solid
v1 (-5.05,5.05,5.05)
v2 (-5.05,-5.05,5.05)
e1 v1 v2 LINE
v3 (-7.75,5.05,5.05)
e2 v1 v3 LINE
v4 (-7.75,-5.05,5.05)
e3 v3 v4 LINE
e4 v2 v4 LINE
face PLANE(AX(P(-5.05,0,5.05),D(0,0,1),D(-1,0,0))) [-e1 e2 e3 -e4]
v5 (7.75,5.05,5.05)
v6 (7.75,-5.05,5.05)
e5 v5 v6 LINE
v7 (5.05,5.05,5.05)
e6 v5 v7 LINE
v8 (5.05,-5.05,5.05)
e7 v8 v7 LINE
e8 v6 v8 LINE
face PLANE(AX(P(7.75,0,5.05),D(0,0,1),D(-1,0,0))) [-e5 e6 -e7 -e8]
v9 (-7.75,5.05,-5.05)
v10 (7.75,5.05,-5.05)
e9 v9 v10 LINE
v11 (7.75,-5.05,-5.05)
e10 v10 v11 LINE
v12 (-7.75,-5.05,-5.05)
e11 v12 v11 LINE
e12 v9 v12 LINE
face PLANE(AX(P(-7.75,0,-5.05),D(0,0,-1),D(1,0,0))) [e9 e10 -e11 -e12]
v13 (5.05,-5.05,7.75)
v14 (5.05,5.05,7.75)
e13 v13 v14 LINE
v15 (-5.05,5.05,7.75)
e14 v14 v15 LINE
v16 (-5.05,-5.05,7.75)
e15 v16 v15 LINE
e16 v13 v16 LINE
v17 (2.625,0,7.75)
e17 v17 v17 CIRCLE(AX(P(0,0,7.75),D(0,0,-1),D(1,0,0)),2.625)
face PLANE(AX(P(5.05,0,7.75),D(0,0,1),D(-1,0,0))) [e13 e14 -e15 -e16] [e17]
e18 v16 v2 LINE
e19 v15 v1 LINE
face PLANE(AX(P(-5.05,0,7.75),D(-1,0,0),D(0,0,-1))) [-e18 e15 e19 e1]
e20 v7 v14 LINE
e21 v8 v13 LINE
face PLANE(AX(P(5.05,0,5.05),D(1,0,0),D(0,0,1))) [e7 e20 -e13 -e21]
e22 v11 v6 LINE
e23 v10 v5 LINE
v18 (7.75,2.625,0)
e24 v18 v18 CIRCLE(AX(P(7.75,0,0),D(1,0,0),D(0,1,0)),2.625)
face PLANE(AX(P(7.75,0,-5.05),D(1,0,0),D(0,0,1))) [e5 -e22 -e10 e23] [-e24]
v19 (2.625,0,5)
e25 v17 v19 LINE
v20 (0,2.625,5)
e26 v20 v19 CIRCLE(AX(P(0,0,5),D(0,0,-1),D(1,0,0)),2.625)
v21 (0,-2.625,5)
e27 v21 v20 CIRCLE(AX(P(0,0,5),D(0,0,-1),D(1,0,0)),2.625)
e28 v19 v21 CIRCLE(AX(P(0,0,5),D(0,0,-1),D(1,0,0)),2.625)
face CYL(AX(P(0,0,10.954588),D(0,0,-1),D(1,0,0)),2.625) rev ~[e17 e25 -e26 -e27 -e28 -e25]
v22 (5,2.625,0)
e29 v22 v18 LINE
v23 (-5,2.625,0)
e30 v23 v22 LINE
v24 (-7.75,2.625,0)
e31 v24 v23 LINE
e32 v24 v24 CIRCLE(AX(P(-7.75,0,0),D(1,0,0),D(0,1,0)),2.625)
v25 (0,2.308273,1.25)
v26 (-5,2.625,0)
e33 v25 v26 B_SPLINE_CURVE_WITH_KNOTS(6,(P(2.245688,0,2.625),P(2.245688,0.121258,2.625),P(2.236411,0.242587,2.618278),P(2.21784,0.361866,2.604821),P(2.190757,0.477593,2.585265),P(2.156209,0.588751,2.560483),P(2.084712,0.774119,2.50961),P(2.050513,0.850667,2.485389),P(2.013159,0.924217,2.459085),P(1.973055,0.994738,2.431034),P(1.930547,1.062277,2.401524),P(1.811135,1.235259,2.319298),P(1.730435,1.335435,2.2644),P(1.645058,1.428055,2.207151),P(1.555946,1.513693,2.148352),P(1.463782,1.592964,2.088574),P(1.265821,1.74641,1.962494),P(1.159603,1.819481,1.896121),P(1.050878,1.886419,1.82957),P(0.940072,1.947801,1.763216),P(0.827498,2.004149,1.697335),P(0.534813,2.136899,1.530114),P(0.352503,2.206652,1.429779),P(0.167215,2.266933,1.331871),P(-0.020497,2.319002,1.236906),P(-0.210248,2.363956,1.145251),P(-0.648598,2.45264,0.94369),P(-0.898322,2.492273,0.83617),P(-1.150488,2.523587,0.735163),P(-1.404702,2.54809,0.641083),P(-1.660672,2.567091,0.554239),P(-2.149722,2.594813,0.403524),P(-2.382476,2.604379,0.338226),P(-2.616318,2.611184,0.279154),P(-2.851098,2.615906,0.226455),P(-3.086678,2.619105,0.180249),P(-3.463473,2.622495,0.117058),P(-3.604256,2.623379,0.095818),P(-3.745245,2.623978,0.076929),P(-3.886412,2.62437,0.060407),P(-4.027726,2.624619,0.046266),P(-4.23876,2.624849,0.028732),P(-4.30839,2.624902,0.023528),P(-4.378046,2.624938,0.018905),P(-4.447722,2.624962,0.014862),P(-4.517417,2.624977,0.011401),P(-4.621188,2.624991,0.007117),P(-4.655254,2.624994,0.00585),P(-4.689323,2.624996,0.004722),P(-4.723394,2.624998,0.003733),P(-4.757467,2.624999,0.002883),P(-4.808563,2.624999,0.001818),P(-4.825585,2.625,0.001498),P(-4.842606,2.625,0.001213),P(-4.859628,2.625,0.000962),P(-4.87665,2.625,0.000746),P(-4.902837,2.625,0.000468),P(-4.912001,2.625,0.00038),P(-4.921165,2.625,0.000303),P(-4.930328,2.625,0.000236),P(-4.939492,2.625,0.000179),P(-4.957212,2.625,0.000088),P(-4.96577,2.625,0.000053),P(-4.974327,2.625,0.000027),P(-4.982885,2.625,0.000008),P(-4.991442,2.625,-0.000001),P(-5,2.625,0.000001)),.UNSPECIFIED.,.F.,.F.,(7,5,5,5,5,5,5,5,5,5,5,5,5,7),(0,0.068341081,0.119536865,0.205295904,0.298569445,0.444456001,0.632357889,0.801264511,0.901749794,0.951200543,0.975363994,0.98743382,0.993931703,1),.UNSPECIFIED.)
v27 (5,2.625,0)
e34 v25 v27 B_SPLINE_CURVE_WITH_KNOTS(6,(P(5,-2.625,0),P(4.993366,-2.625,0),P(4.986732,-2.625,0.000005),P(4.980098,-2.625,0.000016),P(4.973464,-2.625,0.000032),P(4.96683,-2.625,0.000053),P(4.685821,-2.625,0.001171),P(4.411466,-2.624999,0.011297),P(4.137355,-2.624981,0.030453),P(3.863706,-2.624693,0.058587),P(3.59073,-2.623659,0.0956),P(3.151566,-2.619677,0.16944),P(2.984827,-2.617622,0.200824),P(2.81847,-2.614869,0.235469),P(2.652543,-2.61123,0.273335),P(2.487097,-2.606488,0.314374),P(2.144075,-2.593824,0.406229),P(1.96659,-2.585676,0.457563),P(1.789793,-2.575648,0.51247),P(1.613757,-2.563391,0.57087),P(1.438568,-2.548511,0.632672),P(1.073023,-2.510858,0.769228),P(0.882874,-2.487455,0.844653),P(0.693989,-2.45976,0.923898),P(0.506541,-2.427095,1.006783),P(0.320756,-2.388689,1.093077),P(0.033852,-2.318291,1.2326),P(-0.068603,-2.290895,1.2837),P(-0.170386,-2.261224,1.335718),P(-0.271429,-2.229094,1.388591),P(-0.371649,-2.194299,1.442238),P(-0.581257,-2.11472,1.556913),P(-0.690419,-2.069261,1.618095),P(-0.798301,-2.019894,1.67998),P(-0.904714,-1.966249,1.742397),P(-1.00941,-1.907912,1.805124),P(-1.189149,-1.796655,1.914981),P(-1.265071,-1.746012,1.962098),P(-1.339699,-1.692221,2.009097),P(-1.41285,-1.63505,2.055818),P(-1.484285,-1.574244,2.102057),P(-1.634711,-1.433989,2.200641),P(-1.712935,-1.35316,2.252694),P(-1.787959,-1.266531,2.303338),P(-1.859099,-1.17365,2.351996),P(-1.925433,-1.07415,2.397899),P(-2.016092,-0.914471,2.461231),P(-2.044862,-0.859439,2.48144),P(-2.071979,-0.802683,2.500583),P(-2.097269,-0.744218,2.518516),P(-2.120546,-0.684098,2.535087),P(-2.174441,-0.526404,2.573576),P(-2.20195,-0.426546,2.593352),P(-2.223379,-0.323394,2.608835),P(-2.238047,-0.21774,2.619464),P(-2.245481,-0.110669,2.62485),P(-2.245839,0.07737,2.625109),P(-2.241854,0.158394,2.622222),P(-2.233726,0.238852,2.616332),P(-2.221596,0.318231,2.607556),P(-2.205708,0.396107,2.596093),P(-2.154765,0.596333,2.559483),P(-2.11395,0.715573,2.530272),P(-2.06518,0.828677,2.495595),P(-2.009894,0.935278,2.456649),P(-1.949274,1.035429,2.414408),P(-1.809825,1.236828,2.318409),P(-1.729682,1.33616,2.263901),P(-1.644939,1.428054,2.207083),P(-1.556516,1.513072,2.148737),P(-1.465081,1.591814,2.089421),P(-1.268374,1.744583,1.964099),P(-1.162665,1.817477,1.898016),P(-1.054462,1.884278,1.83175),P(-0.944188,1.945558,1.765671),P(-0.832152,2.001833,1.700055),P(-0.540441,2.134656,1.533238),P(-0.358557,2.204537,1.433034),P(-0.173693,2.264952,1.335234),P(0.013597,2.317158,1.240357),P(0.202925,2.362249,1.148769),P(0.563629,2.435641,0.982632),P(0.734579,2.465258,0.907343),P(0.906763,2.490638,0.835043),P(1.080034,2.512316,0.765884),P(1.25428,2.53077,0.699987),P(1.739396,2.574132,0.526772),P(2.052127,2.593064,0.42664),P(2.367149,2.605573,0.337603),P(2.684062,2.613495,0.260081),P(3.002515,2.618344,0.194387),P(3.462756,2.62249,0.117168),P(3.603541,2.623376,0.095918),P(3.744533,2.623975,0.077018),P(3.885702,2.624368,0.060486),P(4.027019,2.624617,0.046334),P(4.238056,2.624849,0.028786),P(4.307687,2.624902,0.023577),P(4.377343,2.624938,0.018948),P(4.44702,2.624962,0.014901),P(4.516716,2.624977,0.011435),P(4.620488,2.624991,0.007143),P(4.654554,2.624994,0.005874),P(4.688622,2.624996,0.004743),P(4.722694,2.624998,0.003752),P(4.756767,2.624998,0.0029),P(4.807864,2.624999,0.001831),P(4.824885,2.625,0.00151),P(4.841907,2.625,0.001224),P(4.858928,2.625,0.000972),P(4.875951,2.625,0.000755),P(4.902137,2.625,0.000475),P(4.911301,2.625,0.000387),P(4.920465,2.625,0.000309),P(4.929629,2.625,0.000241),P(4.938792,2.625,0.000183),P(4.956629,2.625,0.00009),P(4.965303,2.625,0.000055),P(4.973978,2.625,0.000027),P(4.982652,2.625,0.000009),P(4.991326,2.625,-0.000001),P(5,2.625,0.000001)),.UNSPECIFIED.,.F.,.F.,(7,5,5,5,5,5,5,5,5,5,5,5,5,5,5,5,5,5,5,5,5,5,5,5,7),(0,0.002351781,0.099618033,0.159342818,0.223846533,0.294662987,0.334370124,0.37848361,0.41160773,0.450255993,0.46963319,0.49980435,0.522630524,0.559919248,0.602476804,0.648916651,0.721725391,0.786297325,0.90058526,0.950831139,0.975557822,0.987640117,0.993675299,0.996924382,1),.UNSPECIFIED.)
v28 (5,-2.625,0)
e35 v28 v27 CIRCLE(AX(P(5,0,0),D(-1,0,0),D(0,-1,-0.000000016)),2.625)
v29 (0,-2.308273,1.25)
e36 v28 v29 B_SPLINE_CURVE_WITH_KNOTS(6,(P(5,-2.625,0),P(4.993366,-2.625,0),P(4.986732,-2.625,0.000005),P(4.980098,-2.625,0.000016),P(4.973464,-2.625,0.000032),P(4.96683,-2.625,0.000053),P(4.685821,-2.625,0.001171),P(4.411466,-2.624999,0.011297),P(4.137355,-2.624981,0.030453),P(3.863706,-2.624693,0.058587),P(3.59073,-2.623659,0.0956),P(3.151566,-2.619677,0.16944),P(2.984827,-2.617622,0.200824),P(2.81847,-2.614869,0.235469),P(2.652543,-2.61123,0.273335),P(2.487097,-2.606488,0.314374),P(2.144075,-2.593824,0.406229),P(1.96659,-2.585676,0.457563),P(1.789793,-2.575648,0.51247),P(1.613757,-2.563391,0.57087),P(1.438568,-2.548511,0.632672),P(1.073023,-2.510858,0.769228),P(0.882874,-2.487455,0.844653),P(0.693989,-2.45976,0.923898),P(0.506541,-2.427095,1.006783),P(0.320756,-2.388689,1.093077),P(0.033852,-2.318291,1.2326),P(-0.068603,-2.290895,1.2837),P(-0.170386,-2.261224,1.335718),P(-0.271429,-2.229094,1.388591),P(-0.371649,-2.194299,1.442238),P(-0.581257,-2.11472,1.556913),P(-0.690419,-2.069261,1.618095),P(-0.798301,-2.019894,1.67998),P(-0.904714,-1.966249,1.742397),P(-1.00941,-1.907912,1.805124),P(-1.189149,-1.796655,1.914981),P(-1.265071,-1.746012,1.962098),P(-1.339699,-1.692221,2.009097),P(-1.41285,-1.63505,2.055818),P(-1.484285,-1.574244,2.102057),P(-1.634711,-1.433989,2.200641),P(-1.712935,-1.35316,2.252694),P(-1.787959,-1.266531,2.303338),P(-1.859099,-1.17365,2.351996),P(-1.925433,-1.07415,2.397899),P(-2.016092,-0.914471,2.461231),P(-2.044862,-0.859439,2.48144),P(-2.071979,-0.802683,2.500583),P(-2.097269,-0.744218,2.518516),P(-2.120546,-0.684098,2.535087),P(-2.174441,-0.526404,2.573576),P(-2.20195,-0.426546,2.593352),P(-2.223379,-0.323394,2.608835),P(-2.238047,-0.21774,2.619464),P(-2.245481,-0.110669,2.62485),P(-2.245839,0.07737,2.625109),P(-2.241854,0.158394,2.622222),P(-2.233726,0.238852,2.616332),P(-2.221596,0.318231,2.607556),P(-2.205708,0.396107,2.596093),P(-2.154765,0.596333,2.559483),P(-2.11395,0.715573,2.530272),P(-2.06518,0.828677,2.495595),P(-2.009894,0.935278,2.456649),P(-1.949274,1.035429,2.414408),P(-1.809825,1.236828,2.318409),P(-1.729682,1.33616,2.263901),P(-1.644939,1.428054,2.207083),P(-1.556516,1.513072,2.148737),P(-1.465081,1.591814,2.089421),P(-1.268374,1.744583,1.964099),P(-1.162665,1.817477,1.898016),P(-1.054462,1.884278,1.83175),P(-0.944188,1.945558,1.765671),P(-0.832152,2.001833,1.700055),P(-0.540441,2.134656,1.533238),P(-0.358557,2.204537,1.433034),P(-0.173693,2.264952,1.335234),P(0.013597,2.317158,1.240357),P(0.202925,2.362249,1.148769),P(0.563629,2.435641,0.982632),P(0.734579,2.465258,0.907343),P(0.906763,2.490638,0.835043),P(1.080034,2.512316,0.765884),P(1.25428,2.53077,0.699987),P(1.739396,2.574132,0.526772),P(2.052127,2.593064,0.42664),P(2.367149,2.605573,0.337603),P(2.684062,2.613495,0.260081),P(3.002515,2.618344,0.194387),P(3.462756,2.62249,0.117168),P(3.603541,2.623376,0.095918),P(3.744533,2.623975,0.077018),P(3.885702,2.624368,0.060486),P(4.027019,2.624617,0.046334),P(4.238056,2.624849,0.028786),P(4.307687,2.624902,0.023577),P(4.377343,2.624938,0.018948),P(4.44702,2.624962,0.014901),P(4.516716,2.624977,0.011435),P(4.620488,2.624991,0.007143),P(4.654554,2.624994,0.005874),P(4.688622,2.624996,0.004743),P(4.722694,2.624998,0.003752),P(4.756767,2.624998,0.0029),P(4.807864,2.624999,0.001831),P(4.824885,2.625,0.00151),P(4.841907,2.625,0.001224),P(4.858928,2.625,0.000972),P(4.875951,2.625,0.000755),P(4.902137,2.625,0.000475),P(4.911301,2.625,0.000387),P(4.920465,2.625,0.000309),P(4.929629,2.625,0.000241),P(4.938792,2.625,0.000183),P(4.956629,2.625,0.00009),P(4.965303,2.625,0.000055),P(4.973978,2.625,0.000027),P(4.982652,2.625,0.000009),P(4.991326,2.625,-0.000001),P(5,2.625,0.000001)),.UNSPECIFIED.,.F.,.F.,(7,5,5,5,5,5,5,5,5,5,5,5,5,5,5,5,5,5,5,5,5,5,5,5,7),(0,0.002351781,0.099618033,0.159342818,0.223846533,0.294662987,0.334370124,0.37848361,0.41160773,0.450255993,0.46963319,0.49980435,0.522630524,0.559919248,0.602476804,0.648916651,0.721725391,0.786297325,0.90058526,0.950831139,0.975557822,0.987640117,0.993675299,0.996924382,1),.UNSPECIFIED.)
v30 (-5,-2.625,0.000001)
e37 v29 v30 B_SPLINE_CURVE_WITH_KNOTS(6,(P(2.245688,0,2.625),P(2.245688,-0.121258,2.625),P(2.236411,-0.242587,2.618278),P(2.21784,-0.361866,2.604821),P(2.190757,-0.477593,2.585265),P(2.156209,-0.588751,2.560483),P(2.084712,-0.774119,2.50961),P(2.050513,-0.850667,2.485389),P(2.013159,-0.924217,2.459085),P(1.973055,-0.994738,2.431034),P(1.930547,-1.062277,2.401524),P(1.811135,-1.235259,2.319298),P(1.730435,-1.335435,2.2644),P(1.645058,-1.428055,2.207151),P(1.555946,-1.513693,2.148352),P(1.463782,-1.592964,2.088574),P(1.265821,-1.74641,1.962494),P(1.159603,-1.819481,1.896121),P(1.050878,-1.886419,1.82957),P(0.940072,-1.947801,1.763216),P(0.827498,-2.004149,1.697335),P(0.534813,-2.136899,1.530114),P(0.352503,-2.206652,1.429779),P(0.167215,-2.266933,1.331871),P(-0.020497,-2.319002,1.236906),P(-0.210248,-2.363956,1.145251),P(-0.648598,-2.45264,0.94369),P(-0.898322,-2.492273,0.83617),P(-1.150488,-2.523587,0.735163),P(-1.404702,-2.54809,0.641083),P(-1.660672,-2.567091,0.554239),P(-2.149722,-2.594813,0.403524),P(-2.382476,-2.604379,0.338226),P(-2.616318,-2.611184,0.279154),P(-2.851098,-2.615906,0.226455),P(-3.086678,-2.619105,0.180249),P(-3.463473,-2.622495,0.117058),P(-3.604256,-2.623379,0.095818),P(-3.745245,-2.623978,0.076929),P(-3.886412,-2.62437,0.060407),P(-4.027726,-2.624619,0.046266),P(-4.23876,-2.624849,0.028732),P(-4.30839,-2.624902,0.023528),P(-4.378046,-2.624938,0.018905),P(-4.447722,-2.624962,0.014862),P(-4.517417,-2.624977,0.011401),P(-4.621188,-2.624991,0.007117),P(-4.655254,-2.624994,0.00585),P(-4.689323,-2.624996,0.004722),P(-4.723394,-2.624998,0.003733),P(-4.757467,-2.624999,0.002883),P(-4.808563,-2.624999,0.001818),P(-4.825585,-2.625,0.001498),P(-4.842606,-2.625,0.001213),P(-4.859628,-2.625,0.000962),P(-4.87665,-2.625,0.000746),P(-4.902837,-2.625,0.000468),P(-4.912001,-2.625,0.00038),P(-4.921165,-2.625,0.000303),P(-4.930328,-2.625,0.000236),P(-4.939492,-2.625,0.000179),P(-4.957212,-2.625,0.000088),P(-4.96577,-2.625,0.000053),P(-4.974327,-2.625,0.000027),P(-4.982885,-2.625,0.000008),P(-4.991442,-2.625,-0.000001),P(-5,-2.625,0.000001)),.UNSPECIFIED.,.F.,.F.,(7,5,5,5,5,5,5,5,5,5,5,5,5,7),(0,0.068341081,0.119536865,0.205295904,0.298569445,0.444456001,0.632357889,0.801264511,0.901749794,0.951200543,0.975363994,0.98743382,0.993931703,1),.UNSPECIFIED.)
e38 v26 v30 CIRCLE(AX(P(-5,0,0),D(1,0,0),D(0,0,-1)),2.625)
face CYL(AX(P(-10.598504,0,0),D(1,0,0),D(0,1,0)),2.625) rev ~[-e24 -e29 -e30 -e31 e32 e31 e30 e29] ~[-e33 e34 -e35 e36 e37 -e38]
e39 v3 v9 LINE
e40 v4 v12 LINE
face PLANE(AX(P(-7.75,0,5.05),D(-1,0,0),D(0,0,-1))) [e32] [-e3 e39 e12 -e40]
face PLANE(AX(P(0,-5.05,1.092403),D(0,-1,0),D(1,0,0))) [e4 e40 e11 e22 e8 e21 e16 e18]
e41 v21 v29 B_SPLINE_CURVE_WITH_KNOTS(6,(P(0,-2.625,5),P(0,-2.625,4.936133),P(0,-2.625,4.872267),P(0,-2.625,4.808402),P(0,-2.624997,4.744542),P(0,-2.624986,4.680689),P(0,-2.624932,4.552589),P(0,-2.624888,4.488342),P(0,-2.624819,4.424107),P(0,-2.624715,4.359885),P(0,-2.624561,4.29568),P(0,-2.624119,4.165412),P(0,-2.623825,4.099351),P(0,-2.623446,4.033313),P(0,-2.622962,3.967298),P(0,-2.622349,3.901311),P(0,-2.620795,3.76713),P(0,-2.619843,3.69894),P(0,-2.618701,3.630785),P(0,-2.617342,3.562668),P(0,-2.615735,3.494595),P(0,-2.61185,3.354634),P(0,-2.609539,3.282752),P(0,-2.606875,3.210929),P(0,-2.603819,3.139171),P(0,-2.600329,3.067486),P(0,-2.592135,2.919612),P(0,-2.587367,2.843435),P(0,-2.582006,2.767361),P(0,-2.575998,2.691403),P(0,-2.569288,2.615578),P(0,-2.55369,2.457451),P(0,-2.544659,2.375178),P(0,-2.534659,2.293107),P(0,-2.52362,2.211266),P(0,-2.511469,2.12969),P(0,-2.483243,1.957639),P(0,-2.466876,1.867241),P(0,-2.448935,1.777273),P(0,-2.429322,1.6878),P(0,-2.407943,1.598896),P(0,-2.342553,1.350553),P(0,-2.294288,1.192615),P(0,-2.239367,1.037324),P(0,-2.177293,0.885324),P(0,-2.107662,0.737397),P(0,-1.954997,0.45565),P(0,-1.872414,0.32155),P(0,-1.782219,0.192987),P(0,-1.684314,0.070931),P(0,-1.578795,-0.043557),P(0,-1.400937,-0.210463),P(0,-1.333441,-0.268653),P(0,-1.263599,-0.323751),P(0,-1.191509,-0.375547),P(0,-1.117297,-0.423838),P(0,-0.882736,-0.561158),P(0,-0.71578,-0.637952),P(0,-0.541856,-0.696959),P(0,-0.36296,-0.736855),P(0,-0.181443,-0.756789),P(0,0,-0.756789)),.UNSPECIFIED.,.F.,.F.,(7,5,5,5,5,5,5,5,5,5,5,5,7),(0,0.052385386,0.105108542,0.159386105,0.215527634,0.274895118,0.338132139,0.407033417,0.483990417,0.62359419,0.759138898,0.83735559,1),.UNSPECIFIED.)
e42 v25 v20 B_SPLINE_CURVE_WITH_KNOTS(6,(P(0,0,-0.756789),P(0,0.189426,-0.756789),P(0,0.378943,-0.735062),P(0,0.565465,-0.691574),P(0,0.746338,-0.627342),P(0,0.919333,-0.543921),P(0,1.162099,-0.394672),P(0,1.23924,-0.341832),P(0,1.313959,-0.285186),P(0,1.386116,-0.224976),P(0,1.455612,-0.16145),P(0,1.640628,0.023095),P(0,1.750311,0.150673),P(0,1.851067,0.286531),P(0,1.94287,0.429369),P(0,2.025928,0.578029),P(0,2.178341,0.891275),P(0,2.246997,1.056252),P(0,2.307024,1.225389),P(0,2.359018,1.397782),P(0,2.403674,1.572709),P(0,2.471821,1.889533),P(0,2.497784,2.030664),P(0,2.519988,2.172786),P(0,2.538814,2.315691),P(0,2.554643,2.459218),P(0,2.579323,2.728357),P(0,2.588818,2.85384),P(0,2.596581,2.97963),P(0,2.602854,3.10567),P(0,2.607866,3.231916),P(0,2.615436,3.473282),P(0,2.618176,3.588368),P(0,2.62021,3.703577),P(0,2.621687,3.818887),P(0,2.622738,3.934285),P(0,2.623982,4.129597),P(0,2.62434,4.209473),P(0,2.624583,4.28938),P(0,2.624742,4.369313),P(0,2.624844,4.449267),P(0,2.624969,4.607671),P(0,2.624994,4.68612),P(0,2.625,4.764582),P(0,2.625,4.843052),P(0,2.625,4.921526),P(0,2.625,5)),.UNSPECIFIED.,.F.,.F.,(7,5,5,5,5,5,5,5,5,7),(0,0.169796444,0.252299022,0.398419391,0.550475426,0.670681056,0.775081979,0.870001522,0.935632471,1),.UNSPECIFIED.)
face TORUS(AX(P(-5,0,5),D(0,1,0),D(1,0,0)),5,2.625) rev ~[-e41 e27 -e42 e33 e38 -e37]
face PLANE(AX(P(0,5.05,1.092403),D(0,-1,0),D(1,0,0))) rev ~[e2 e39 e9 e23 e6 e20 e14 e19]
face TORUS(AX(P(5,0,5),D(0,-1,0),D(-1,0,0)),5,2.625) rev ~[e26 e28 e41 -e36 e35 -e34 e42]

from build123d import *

# Parameters (mm, degrees)
F1_DEPTH = 5.05
F2_R     = 2.625
F5_R     = 2.625


with BuildPart() as f1:
    # F0 (on Front) → F1 (new body, symmetric)
    with BuildSketch(Plane.XZ):
        Polygon((0, 7.75), (-5.05, 7.75), (-5.05, 5.05), (-7.75, 5.05), (-7.75, 0), (-7.75, -5.05), (7.75, -5.05), (7.75, 0), (7.75, 5.05), (5.05, 5.05), (5.05, 7.75), align=None)
    extrude(amount=F1_DEPTH, both=True)

    # F4: sweep along a path in F3
    with BuildLine(Plane.XZ) as f4_path:
        Line((-10.5985039845, 0), (11.5115959197, 0))
    # F2 (on Right) → F4 (sweep, cut)
    with BuildSketch(Plane.YZ):
        Circle(F2_R)
    sweep(path=f4_path.line, mode=Mode.SUBTRACT)

    # F7: sweep along a path in F6
    with BuildLine(Plane.XZ) as f7_path:
        Line((0, 10.9545877203), (0, 5))
        ThreePointArc((0, 5), (1.4644660941, 1.4644660941), (5, 0))
    # F5 (on face) → F7 (sweep, cut)
    with BuildSketch(Plane.XY.offset(7.75)):
        Circle(F5_R)
    sweep(path=f7_path.line, mode=Mode.SUBTRACT)

    # F8: sweep along a path in F6
    with BuildLine(Plane.XZ) as f8_path:
        Line((0, 10.9545877203), (0, 5))
        ThreePointArc((0, 5), (-1.4644660941, 1.4644660941), (-5, 0))
    # F5 (on face) → F8 (sweep, cut)
    with BuildSketch(Plane.XY.offset(7.75)):
        Circle(F5_R)
    sweep(path=f8_path.line, mode=Mode.SUBTRACT)


solid = f1.part
